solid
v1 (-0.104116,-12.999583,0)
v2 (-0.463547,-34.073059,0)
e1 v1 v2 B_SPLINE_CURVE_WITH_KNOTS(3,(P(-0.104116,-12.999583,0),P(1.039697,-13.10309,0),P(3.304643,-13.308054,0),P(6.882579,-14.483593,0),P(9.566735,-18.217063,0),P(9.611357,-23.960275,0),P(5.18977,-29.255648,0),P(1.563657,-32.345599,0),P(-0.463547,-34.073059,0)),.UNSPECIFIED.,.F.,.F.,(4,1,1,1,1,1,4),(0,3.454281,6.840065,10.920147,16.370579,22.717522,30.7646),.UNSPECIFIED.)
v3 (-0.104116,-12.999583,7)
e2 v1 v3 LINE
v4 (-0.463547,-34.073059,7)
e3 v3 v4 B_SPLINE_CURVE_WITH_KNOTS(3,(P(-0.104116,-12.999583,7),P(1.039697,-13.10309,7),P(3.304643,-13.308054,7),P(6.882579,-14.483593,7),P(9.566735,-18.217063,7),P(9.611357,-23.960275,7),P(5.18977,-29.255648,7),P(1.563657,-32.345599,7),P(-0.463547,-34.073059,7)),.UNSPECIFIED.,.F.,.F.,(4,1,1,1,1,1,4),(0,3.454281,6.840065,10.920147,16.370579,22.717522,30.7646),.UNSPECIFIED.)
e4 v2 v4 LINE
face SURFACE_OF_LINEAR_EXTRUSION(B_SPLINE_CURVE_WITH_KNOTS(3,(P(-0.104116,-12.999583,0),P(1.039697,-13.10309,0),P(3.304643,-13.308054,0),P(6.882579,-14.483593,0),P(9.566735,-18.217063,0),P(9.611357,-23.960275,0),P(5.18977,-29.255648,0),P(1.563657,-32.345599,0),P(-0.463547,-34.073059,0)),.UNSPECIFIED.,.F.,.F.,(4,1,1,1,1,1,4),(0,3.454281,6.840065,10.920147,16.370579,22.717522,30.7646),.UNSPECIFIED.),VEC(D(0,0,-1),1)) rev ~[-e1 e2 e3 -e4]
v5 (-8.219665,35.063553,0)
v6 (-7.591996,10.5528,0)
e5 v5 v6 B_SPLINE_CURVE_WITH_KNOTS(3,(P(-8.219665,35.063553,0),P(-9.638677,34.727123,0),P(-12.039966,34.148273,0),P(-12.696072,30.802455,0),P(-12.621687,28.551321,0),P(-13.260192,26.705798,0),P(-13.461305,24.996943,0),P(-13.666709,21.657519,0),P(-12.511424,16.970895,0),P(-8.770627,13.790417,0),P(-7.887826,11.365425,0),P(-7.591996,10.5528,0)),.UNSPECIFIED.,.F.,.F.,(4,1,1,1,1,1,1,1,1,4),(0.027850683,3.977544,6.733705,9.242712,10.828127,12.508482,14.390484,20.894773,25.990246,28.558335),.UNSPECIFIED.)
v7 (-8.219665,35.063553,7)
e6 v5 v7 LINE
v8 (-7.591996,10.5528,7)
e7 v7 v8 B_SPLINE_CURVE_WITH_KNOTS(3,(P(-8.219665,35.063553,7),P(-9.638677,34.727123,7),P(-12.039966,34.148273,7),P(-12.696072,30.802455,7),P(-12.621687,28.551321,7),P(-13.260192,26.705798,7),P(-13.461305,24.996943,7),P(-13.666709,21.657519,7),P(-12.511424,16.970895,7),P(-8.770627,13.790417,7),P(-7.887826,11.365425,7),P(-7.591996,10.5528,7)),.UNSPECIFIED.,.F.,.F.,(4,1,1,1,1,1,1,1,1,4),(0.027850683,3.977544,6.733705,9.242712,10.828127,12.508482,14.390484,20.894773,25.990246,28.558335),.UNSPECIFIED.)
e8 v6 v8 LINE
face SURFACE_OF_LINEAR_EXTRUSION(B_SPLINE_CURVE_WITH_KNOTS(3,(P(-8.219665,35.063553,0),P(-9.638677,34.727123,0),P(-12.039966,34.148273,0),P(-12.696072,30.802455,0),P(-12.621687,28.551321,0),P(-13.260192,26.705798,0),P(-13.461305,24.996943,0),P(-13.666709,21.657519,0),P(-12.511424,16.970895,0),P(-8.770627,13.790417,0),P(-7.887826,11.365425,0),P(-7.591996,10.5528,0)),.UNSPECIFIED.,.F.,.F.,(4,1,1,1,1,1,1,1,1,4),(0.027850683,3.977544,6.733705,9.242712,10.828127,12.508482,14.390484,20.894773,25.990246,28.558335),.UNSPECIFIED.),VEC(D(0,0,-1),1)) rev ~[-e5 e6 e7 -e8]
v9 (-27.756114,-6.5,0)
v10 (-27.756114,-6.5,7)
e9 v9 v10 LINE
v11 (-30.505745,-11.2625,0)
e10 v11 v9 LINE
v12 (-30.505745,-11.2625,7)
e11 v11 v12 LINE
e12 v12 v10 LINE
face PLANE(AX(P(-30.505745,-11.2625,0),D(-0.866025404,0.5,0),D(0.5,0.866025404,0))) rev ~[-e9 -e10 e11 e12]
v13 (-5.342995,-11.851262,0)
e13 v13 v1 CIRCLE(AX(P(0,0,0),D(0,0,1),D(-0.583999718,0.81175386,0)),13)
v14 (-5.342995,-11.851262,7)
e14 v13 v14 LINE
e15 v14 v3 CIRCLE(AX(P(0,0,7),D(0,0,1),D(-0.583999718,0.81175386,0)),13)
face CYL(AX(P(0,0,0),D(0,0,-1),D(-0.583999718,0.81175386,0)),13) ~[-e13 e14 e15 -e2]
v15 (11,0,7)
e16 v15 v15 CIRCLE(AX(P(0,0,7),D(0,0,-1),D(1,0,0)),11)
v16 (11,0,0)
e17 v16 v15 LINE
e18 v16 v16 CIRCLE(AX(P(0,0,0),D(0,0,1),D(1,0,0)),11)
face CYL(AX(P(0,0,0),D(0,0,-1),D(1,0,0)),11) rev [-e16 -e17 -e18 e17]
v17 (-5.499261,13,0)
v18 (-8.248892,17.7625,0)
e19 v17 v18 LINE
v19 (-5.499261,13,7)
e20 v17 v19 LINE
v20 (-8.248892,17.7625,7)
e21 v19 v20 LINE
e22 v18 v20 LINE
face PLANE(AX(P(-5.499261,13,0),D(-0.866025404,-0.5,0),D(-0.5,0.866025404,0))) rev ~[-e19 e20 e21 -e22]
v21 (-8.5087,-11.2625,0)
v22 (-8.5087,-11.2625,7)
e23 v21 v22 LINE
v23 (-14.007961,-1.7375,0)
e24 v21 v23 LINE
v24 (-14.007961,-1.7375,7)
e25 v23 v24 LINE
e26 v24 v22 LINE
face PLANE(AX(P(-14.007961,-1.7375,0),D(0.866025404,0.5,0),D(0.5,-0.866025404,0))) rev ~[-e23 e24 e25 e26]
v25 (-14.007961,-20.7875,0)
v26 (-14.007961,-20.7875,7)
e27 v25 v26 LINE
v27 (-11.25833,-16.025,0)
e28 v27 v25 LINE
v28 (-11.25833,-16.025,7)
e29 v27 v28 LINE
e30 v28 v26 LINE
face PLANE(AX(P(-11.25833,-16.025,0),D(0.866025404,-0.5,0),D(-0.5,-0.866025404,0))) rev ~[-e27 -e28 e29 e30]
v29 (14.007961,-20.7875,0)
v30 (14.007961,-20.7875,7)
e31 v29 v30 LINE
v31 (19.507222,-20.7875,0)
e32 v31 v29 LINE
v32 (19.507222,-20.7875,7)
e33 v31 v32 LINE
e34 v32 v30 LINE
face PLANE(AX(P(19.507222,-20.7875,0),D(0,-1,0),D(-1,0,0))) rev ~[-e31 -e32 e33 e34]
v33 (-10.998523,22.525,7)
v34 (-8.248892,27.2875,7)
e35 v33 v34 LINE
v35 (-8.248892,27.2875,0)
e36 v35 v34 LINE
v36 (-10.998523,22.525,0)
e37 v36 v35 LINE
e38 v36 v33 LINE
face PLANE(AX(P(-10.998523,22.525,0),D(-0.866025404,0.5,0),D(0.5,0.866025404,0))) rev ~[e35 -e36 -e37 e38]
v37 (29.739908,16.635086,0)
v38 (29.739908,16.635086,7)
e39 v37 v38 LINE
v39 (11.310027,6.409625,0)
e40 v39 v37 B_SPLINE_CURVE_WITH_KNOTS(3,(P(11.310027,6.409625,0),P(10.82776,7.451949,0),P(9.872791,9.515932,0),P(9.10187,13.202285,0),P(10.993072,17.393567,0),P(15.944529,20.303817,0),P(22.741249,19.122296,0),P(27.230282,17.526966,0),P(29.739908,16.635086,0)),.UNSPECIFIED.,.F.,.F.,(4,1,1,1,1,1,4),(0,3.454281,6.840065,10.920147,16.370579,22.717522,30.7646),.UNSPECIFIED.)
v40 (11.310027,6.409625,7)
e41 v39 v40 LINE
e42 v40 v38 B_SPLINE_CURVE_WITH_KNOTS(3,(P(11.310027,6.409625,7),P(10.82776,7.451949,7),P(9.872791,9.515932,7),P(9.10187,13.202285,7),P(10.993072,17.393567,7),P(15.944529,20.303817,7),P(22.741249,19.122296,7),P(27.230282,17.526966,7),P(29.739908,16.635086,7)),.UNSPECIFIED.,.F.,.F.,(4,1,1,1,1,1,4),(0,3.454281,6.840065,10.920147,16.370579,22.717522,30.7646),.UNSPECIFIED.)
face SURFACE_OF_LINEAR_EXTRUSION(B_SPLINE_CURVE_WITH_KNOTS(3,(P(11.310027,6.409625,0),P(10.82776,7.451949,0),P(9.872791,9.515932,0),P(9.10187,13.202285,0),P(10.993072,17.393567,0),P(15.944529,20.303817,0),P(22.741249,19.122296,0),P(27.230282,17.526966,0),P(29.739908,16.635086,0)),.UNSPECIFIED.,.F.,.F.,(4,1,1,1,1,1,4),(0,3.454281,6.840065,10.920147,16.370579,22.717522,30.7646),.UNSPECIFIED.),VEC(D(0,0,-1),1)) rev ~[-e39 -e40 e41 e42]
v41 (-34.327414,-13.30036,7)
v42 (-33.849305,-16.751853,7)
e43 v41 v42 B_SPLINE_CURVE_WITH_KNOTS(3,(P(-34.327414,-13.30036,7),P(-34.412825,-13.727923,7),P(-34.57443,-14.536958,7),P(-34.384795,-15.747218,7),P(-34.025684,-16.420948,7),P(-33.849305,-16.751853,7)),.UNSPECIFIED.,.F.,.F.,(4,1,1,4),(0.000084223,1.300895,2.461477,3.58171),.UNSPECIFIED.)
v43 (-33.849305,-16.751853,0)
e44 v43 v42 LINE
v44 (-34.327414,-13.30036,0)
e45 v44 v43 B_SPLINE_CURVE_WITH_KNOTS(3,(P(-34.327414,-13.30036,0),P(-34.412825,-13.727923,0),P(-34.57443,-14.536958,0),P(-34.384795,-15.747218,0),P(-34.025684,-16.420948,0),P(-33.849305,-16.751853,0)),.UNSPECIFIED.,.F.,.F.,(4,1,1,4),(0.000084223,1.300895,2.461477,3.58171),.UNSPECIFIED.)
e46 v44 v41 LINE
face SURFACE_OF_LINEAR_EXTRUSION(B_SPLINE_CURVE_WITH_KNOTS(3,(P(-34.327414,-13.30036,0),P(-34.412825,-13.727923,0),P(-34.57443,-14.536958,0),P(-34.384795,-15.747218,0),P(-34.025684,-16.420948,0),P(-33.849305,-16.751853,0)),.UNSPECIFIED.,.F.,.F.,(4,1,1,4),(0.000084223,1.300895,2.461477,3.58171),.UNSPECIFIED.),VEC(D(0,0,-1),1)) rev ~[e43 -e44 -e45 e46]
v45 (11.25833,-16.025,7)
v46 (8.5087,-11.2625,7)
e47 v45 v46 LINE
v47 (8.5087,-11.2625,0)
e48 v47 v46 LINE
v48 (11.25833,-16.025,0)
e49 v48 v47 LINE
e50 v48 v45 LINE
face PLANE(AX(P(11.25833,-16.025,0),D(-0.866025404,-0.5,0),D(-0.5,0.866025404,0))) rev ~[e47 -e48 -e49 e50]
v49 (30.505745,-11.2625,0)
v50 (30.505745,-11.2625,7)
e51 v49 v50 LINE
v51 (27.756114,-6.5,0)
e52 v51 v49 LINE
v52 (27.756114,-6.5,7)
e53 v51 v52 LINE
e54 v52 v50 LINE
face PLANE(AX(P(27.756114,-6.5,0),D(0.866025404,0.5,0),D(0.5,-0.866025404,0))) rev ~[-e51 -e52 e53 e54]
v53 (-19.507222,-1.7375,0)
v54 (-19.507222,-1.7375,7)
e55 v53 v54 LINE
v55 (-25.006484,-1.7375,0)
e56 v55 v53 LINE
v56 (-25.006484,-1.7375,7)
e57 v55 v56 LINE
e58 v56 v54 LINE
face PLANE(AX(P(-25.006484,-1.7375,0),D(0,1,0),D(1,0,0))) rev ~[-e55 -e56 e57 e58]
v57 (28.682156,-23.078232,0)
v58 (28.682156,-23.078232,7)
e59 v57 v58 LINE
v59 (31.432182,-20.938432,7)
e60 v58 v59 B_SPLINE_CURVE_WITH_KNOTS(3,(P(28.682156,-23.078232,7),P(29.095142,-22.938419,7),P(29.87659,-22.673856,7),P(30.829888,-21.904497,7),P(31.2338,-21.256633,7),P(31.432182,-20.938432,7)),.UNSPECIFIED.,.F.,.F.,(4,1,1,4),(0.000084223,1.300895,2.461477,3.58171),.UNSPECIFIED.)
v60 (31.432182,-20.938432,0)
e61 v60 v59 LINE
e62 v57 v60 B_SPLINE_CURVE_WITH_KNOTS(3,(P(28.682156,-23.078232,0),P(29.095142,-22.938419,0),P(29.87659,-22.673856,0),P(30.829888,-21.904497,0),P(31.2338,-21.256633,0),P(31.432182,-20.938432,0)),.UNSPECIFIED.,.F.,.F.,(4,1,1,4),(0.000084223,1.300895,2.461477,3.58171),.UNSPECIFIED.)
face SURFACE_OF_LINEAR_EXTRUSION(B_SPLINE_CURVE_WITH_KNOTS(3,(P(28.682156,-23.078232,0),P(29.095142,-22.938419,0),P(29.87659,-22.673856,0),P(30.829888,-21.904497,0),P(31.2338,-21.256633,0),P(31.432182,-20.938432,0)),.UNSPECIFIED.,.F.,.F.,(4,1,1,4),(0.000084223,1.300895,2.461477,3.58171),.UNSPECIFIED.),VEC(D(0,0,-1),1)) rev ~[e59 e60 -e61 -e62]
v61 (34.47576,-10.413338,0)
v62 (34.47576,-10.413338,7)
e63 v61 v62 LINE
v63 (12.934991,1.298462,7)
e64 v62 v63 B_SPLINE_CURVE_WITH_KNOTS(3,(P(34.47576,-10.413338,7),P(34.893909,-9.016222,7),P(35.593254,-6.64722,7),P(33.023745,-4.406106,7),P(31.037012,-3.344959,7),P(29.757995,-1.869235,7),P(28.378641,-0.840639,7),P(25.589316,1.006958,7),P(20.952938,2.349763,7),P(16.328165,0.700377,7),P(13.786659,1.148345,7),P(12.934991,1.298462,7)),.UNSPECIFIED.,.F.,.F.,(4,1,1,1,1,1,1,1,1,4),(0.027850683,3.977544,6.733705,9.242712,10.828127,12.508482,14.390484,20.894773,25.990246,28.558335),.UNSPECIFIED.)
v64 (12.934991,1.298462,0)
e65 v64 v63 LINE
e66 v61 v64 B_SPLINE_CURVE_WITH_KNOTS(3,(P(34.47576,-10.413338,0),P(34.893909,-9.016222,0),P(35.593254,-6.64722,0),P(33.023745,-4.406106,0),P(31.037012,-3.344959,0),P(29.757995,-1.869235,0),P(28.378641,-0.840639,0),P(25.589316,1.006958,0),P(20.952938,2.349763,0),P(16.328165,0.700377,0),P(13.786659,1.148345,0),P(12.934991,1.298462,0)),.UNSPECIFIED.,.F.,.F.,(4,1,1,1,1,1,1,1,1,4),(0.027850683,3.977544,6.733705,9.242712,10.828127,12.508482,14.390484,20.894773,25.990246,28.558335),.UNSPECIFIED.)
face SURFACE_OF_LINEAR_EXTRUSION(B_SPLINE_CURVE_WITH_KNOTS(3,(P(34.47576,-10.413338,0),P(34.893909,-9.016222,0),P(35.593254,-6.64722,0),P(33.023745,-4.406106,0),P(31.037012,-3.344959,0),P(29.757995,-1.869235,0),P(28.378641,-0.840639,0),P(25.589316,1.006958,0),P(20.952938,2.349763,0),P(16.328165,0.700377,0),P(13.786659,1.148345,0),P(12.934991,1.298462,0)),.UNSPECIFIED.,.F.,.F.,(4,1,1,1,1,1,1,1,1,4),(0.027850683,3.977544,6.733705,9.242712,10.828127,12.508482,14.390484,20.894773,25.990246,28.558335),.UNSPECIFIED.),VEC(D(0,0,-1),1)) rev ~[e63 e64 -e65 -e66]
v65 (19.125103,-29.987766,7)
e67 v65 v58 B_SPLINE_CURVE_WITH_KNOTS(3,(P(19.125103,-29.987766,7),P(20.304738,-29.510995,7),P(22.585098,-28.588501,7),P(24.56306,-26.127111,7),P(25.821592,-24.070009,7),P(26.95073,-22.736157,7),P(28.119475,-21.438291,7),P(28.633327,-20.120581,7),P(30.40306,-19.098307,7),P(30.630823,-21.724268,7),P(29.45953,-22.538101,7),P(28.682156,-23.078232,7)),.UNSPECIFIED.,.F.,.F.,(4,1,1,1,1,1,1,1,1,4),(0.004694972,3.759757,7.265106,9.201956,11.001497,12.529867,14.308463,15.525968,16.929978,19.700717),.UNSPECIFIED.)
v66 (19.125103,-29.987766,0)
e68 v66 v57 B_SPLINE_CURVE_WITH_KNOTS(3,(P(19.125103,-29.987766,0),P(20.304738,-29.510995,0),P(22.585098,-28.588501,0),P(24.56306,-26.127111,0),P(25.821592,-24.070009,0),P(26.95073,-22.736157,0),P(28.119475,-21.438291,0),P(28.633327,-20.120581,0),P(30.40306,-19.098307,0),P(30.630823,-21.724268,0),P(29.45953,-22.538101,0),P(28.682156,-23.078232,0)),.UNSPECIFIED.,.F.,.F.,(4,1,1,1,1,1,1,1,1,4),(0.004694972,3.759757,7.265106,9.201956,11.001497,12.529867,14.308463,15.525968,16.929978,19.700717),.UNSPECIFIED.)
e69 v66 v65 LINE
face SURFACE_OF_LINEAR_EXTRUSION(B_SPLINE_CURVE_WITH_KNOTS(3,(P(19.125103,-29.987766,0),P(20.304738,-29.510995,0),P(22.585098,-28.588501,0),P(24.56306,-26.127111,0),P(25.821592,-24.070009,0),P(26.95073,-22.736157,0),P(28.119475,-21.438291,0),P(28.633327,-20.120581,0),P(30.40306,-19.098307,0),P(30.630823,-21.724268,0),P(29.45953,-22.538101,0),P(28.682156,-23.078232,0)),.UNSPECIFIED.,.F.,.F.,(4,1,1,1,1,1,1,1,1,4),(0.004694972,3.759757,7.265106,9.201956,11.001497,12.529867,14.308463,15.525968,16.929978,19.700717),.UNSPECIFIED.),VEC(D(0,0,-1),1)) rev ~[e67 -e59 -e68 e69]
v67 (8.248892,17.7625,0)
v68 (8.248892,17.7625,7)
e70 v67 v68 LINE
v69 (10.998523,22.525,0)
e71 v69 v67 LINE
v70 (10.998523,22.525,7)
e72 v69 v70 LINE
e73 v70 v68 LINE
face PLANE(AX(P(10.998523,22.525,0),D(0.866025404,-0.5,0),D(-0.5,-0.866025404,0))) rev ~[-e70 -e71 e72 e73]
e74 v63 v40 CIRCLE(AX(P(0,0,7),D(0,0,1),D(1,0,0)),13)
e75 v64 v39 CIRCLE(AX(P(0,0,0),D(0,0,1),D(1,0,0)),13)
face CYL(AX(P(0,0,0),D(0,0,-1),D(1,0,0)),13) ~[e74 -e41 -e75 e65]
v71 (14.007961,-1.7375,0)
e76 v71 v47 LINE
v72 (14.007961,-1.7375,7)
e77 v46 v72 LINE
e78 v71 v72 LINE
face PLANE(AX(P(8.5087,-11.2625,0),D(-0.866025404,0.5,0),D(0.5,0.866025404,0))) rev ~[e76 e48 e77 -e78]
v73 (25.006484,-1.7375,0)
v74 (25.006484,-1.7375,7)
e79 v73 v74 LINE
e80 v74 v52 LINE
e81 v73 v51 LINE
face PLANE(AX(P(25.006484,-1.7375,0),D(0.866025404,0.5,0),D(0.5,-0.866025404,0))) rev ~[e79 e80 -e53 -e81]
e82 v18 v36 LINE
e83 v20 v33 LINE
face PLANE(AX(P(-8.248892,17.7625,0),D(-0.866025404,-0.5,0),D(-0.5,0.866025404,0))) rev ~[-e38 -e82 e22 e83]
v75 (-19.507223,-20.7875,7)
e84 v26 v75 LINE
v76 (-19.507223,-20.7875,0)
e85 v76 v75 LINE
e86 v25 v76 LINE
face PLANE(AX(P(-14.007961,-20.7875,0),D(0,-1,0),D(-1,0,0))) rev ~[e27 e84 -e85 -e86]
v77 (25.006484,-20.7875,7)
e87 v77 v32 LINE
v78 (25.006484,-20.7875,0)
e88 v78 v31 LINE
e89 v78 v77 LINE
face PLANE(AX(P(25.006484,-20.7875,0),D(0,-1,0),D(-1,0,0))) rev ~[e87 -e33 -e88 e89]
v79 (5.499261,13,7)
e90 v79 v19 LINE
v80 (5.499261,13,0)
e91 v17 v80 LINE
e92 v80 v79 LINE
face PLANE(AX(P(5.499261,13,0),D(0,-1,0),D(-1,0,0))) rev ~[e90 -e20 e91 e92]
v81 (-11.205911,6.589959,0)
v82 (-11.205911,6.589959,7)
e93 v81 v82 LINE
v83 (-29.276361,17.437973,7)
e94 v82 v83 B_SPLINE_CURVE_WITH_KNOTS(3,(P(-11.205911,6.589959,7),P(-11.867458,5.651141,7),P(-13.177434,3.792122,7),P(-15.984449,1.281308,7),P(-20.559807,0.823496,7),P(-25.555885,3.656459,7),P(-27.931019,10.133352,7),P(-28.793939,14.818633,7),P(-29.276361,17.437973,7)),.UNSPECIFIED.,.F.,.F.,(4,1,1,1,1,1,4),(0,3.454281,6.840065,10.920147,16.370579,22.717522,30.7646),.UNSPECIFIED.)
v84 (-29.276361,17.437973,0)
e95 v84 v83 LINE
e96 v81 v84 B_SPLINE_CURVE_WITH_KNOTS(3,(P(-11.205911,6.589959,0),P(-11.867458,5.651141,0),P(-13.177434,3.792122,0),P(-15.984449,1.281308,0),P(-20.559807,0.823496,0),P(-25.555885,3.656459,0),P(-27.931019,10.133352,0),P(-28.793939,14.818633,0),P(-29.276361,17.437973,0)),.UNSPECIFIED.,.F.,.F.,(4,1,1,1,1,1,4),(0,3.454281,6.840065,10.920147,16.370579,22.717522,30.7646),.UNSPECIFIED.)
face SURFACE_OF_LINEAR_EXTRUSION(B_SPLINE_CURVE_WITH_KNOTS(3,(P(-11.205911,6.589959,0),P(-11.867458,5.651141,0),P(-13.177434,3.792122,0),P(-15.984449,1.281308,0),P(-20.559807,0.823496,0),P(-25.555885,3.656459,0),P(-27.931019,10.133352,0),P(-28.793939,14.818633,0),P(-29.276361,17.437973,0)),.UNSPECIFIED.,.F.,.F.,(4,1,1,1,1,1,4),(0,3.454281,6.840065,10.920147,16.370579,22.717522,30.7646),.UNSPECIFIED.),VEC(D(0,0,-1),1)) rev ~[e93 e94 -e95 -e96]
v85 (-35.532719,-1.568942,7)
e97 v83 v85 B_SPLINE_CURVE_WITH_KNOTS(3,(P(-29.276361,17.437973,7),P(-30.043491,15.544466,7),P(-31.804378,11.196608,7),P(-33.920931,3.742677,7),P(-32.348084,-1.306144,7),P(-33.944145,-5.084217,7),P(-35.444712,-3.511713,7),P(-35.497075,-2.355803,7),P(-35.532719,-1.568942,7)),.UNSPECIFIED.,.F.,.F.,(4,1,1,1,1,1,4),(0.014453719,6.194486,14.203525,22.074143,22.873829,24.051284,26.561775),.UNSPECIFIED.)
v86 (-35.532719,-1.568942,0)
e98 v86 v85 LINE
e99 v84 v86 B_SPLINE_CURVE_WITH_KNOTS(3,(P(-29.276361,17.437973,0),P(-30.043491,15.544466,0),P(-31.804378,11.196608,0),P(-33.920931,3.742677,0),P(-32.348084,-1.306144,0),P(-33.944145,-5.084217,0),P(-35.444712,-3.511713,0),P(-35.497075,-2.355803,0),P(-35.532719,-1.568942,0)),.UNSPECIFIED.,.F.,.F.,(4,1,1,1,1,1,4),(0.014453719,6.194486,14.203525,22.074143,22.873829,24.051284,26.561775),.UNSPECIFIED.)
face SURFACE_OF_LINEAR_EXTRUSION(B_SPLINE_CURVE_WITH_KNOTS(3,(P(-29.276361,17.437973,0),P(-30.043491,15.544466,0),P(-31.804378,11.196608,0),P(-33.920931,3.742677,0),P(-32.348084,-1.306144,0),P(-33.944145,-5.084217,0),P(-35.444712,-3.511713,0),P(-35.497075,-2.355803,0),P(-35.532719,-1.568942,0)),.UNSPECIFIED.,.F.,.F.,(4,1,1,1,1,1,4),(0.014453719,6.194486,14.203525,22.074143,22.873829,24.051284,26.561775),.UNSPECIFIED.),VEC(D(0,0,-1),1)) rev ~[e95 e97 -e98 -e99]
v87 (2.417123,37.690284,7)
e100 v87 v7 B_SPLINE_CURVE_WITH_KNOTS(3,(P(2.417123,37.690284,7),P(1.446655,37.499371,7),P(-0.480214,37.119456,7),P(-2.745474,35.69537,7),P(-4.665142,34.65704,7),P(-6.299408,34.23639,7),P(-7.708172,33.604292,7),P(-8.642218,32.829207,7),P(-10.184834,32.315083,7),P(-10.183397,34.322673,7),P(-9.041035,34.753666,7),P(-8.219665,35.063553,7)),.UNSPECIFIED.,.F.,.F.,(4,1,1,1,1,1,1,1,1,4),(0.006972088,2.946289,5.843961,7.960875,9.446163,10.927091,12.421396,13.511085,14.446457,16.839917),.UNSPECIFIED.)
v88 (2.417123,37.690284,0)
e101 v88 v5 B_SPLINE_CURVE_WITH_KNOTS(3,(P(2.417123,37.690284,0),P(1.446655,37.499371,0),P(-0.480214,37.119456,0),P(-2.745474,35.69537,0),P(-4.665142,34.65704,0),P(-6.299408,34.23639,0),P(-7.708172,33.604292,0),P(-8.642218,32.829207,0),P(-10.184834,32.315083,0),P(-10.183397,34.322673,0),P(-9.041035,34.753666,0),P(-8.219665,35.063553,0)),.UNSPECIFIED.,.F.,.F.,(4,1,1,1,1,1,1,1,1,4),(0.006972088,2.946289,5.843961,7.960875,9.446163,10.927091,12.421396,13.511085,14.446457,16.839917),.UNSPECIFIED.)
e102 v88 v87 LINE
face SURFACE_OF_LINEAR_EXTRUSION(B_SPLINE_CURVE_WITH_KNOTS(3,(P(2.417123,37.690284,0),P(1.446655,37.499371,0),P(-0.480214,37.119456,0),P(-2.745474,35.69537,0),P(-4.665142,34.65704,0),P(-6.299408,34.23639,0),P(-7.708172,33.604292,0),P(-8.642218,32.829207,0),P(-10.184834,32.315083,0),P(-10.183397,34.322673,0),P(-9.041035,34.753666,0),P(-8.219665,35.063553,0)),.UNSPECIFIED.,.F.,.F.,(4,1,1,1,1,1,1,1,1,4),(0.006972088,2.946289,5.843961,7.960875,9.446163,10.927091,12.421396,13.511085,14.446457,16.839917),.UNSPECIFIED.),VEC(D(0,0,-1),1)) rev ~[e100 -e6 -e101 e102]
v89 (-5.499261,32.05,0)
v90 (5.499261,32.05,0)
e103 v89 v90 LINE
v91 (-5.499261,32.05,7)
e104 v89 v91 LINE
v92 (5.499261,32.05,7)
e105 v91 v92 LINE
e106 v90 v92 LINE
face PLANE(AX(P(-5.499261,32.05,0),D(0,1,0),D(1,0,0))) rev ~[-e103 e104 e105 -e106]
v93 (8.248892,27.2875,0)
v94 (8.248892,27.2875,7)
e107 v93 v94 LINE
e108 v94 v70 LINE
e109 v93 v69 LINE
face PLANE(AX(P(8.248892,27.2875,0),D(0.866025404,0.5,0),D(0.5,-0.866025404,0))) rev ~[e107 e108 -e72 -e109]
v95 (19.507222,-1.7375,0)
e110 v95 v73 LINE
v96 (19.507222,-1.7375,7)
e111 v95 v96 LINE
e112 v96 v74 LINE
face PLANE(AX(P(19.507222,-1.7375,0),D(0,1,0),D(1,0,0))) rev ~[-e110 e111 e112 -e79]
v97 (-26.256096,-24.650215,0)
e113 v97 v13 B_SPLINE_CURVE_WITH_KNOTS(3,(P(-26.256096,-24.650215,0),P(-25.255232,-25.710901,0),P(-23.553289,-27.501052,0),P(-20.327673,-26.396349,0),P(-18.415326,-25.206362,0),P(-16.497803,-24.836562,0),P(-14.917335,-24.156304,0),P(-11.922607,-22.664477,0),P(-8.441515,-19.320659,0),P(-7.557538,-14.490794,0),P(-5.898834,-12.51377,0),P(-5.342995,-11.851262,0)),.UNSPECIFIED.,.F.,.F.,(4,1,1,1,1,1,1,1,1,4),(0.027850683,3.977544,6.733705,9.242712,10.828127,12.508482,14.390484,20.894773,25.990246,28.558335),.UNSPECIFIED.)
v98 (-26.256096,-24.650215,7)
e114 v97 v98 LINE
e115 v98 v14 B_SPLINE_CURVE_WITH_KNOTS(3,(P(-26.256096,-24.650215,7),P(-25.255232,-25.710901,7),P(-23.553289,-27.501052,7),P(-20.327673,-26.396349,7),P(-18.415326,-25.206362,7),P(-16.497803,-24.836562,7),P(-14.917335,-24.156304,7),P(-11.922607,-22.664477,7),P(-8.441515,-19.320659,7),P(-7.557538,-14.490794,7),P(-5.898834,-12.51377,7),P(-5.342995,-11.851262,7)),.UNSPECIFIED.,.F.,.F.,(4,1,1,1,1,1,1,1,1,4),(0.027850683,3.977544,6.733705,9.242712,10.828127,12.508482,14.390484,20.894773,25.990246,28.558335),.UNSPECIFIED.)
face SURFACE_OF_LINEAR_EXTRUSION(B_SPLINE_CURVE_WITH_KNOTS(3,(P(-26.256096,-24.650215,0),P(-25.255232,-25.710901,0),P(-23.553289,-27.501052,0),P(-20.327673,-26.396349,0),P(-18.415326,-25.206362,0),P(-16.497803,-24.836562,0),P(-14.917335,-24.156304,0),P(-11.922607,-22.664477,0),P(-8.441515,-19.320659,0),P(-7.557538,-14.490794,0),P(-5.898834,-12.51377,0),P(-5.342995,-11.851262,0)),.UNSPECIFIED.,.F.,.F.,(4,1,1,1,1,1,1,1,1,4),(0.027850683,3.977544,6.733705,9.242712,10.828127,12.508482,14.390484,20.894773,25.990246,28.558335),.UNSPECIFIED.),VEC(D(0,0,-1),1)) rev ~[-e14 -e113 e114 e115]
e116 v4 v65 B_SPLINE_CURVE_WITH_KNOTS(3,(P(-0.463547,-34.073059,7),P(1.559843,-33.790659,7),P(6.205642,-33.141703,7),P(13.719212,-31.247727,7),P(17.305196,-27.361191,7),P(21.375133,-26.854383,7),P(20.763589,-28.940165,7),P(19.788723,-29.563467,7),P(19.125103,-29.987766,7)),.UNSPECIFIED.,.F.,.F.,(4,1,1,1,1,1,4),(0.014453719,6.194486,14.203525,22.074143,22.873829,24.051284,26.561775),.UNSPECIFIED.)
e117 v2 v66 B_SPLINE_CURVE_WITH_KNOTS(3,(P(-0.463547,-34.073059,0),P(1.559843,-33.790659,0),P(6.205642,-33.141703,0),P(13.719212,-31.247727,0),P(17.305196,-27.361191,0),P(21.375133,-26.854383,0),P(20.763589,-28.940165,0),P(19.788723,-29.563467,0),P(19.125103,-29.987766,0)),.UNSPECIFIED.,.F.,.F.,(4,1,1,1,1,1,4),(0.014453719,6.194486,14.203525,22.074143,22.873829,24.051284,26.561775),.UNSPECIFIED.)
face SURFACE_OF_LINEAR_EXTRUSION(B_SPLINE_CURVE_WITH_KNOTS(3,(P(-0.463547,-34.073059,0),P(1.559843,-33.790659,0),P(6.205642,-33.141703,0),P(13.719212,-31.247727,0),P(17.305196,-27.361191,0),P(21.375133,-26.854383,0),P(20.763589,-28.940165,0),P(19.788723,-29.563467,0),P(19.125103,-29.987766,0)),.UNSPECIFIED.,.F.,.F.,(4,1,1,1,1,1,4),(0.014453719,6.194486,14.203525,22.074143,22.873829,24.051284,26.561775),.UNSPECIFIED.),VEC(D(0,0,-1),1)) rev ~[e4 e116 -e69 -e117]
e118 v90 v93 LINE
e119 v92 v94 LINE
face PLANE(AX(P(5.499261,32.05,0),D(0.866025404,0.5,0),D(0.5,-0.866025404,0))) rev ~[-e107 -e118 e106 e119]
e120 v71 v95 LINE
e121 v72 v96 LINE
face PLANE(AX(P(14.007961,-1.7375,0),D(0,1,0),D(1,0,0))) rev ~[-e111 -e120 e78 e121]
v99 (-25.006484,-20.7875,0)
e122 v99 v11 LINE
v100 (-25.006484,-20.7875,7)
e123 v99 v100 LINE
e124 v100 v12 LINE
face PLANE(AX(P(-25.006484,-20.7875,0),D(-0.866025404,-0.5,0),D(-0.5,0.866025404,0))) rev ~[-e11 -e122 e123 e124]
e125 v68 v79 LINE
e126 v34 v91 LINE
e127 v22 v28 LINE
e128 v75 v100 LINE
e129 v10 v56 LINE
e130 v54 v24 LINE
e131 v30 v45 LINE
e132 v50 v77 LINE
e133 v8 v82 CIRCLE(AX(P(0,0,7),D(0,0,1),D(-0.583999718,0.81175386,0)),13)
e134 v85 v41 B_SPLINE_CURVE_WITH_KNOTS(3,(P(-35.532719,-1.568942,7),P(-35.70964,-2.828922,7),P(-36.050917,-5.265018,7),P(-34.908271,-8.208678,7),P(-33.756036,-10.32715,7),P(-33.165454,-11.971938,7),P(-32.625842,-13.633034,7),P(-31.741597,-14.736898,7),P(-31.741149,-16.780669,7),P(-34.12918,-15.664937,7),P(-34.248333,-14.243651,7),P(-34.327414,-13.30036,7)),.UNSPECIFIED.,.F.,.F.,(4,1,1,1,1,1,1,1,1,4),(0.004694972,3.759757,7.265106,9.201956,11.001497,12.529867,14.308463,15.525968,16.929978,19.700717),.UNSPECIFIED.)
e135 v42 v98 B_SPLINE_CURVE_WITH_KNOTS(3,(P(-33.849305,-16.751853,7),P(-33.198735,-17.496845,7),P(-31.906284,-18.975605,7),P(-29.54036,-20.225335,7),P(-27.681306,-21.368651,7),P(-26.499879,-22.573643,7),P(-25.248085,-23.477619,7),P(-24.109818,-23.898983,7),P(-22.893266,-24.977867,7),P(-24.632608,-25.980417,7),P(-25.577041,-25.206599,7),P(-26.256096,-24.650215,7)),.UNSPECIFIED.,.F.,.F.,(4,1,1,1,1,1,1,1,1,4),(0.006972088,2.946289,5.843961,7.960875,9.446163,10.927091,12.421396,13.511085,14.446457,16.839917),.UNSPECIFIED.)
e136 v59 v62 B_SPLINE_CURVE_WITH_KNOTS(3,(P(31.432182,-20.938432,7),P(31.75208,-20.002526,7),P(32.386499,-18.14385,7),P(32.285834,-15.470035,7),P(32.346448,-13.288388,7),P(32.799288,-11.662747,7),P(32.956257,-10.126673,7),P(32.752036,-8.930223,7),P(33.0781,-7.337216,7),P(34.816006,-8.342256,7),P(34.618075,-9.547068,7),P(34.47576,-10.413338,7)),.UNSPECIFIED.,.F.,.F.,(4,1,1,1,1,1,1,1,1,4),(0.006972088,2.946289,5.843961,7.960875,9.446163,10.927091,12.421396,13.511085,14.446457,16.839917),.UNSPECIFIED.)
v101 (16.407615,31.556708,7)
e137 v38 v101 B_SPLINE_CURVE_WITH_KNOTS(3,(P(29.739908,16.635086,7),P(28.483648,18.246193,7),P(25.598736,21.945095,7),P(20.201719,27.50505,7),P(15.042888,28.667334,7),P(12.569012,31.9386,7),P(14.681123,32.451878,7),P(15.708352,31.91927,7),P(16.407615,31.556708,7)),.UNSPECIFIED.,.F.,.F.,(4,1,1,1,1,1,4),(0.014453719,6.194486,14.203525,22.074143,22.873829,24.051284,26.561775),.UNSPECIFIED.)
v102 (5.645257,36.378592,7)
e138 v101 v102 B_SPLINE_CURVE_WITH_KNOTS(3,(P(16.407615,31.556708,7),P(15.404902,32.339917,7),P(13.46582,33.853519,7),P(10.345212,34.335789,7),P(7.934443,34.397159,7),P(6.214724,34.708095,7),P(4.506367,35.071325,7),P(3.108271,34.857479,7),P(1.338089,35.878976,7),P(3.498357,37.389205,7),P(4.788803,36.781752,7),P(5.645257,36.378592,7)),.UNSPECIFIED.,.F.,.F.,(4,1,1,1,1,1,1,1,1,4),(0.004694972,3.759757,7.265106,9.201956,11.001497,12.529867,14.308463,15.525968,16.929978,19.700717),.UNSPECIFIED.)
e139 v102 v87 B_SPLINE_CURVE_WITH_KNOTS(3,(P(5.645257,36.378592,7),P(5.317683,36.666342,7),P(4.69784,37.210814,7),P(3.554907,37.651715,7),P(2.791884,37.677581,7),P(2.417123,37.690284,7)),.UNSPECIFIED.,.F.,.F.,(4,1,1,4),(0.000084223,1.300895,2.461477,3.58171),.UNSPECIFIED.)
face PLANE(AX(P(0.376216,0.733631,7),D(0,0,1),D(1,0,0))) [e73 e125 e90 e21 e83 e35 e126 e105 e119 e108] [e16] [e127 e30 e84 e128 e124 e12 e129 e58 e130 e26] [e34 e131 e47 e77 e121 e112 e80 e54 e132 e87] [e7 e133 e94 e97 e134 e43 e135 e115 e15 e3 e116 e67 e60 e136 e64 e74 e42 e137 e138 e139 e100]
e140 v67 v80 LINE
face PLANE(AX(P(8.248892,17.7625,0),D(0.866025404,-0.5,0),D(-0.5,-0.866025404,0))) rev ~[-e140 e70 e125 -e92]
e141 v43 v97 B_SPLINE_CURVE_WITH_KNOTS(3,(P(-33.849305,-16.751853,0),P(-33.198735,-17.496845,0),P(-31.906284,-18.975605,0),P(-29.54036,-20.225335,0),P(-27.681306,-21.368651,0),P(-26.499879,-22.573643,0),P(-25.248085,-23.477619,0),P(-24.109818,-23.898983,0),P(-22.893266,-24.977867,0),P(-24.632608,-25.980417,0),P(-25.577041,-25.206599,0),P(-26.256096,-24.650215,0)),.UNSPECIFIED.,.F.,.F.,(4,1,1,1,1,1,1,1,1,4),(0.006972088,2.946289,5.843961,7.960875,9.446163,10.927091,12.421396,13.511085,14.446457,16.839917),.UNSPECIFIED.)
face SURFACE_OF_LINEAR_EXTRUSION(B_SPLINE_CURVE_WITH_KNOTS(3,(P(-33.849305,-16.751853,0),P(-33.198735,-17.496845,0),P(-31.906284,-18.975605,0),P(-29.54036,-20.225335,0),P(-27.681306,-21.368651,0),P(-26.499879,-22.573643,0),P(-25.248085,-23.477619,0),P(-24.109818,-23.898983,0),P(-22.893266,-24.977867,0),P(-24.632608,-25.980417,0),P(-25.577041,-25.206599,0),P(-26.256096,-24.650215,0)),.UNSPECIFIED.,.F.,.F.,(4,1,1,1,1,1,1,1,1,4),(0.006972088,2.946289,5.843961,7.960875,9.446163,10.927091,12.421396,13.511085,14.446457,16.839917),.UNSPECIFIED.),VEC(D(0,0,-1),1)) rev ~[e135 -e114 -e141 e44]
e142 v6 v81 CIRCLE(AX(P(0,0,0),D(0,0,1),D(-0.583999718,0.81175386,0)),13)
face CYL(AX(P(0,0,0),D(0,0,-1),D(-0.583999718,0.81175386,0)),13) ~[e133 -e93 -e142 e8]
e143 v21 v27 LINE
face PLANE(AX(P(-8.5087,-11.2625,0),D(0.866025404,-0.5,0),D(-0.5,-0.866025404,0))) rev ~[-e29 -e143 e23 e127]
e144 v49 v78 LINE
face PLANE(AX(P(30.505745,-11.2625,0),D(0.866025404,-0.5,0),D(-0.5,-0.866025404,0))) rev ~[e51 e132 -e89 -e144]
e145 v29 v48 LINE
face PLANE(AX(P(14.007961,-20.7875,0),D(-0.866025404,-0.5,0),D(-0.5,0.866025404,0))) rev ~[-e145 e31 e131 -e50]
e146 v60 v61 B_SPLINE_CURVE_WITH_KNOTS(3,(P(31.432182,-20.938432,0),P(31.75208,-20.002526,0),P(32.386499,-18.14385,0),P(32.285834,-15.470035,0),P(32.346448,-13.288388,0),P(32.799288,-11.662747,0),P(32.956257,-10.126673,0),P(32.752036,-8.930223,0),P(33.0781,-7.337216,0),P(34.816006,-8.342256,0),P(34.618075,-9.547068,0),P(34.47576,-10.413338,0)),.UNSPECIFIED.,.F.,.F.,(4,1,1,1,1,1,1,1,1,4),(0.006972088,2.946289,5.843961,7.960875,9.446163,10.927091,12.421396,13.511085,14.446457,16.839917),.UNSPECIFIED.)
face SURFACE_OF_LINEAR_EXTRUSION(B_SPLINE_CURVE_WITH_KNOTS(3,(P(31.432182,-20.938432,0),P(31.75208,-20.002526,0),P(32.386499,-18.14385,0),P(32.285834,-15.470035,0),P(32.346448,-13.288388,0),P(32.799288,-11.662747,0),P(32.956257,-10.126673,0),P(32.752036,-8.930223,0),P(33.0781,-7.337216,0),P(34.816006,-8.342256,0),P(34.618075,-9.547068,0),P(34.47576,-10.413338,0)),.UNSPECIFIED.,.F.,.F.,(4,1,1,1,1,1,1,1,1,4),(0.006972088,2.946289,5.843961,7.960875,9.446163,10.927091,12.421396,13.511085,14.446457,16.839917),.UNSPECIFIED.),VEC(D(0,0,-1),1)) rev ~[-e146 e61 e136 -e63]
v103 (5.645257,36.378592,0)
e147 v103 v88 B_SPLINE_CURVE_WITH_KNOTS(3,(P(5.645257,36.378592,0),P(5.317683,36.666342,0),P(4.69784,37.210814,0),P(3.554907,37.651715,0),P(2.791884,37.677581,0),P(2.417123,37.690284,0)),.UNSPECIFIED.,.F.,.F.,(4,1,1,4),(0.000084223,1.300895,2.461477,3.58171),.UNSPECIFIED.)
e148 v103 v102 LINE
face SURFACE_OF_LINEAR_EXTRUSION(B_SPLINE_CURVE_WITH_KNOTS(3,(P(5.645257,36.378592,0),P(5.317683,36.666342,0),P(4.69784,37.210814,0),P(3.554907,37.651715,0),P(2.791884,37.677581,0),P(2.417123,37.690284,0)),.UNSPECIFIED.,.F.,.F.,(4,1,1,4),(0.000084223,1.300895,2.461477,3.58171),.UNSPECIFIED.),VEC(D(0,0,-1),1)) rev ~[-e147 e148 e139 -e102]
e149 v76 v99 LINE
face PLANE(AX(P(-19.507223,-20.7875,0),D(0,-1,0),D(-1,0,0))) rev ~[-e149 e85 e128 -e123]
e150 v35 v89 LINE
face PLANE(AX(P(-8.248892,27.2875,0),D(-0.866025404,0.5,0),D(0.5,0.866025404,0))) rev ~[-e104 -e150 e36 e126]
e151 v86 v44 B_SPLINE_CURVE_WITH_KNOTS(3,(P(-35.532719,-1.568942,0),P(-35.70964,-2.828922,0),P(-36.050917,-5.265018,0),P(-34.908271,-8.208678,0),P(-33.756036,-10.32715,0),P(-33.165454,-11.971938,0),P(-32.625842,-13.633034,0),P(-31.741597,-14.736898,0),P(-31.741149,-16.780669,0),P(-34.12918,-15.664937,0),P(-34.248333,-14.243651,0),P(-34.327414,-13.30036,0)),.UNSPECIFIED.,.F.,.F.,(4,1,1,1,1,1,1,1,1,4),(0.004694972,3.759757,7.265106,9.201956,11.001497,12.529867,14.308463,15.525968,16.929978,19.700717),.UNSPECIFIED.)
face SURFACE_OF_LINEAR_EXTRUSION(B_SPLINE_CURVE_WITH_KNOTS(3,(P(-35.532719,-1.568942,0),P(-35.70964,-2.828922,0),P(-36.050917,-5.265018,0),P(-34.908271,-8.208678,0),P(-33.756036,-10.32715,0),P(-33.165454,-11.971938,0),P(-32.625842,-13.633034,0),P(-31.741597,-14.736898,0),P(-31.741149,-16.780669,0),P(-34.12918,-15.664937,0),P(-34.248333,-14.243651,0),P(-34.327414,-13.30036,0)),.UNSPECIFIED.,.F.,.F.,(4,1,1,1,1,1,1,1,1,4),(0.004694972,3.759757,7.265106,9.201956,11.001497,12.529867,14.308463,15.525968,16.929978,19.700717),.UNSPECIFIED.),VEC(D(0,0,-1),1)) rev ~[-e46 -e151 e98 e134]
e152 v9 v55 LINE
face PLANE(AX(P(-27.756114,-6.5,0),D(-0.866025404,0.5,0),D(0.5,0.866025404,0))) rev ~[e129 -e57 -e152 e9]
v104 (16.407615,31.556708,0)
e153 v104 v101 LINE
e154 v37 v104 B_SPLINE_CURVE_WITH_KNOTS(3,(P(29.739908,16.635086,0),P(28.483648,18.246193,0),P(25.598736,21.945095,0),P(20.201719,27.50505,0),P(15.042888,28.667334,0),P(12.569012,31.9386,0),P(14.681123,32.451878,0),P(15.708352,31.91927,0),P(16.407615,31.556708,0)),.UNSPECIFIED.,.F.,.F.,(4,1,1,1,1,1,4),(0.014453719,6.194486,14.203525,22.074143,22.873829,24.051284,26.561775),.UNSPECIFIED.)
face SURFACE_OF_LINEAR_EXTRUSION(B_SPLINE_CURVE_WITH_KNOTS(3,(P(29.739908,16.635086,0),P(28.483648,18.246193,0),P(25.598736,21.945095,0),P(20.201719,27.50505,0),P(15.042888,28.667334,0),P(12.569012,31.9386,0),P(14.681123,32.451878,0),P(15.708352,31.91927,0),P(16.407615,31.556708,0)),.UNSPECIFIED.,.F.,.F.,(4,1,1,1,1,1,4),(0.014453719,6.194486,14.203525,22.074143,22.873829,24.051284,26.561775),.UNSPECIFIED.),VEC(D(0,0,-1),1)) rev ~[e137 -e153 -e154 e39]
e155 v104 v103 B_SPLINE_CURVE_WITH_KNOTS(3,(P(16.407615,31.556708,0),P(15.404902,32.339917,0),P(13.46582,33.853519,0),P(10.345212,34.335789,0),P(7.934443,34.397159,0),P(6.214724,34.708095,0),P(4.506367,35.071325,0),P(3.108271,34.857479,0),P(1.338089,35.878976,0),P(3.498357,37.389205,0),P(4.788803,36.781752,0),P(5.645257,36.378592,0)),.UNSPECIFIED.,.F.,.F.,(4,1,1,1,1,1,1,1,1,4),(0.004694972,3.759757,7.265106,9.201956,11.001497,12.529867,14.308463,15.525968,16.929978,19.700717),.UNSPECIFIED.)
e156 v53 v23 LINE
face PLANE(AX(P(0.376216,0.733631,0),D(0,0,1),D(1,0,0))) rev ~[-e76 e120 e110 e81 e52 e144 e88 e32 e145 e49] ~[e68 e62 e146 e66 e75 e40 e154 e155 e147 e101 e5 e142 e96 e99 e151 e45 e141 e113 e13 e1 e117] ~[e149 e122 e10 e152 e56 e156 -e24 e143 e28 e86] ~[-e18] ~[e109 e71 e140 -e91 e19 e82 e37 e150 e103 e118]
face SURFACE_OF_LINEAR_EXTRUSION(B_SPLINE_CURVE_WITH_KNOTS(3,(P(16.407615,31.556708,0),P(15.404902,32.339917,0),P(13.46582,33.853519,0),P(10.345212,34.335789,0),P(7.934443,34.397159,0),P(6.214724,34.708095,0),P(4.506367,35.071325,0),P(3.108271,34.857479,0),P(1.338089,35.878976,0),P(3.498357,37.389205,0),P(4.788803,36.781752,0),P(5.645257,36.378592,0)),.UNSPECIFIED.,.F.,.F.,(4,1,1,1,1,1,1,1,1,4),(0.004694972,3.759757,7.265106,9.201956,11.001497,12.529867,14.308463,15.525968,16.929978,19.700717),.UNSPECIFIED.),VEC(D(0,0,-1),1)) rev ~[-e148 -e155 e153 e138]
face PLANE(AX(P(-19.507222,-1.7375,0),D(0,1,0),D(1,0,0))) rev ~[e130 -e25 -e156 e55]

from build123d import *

# Parameters (mm, degrees)
F0_R     = 11
F1_DEPTH = 7
F2_COUNT = 3


# Not quite as in the source:
# - the dataset's text gives a spline's control points without its knots; the knots are read off the source's solid
# - a feature names something its author has since deleted; it is built from what else it names


with BuildPart() as f1:
    # F0 (on Top) → F1 (new body)
    with BuildSketch(Plane.XY):
        with BuildLine():
            ThreePointArc((-7.5919963353, 10.5528001803), (-5.9289142194, -11.5692686104), (13, 0))
            ThreePointArc((13, 0), (12.5704087578, 3.3143360817), (11.3100271289, 6.4096245088))
            ThreePointArc((11.3100271289, 6.4096245088), (6.5450317559, 11.2322107937), (-1.3e-09, 13))
            ThreePointArc((-1.3e-09, 13), (-3.9883328388, 12.3730837372), (-7.5919963353, 10.5528001803))
        make_face()
        Circle(F0_R, mode=Mode.SUBTRACT)
        with BuildLine():
            ThreePointArc((-1.3e-09, 13), (6.5450317559, 11.2322107937), (11.3100271289, 6.4096245088))
            add(Edge.make_bspline(
                [(11.3100271289, 6.4096245088), (10.8277603254, 7.4519494012), (9.8727913781, 9.5159316196), (9.101870084, 13.2022847878), (10.9930717603, 17.3935667079), (15.9445286102, 20.3038165496), (22.7412492325, 19.1222960129), (27.2302822076, 17.5269663637), (29.7399077416, 16.6350860483)],
                knots=[0, 0, 0, 0, 3.454281, 6.840065, 10.920147, 16.370579, 22.717522, 30.7646, 30.7646, 30.7646, 30.7646], degree=3))
            add(Edge.make_bspline(
                [(29.7399077416, 16.6350860483), (28.4836475385, 18.2461931845), (25.5987360843, 21.9450952017), (20.2017189577, 27.5050498478), (15.0428882075, 28.6673343945), (12.5690115148, 31.9385999614), (14.6811233168, 32.4518778122), (15.7083520351, 31.9192701431), (16.407615424, 31.5567081202)],
                knots=[0.0144537192, 0.0144537192, 0.0144537192, 0.0144537192, 6.194486, 14.203525, 22.074143, 22.873829, 24.051284, 26.561775, 26.561775, 26.561775, 26.561775], degree=3))
            add(Edge.make_bspline(
                [(16.407615424, 31.5567081202), (15.4049023222, 32.3399165847), (13.4658196059, 33.8535190511), (10.3452119002, 34.3357889044), (7.9344434577, 34.3971594843), (6.2147244404, 34.7080952785), (4.5063669183, 35.0713247495), (3.1082707439, 34.8574787663), (1.3380885049, 35.8789758676), (3.4983566078, 37.3892054026), (4.7888025313, 36.7817520454), (5.6452574026, 36.3785922272)],
                knots=[0.0046949721, 0.0046949721, 0.0046949721, 0.0046949721, 3.759757, 7.265106, 9.201956, 11.001497, 12.529867, 14.308463, 15.525968, 16.929978, 19.700717, 19.700717, 19.700717, 19.700717], degree=3))
            add(Edge.make_bspline(
                [(5.6452574026, 36.3785922272), (5.3176826436, 36.6663420667), (4.6978399336, 37.2108137216), (3.5549068491, 37.6517152685), (2.7918842622, 37.6775809796), (2.4171225183, 37.6902842884)],
                knots=[8.42234e-05, 8.42234e-05, 8.42234e-05, 8.42234e-05, 1.300895, 2.461477, 3.58171, 3.58171, 3.58171, 3.58171], degree=3))
            add(Edge.make_bspline(
                [(2.4171225183, 37.6902842884), (1.4466554473, 37.4993707055), (-0.4802140411, 37.1194555701), (-2.7454735423, 35.6953695532), (-4.66514216, 34.6570397494), (-6.2994083365, 34.2363899874), (-7.708171918, 33.604292052), (-8.6422176542, 32.8292069294), (-10.184834153, 32.3150830289), (-10.1833973742, 34.322673268), (-9.0410345214, 34.7536662817), (-8.2196646451, 35.0635532875)],
                knots=[0.0069720876, 0.0069720876, 0.0069720876, 0.0069720876, 2.946289, 5.843961, 7.960875, 9.446163, 10.927091, 12.421396, 13.511085, 14.446457, 16.839917, 16.839917, 16.839917, 16.839917], degree=3))
            add(Edge.make_bspline(
                [(-8.2196646451, 35.0635532875), (-9.6386773765, 34.7271226927), (-12.0399656, 34.1482725614), (-12.6960723373, 30.8024553033), (-12.6216866169, 28.5513207343), (-13.2601924534, 26.705797678), (-13.4613053983, 24.996943365), (-13.6667091736, 21.6575187534), (-12.5114237856, 16.9708953473), (-8.770627027, 13.7904170142), (-7.8878258097, 11.3654245815), (-7.5919963353, 10.5528001803)],
                knots=[0.027850683, 0.027850683, 0.027850683, 0.027850683, 3.977544, 6.733705, 9.242712, 10.828127, 12.508482, 14.390484, 20.894773, 25.990246, 28.558335, 28.558335, 28.558335, 28.558335], degree=3))
            ThreePointArc((-7.5919963353, 10.5528001803), (-3.9883328388, 12.3730837372), (-1.3e-09, 13))
        make_face()
        Polygon((5.499261314, 13), (-1.3e-09, 13), (-5.499261314, 13), (-8.2488920963, 17.7625002169), (-10.9985226281, 22.525), (-8.24889179, 27.2875003136), (-5.499261314, 32.05), (0, 32.05), (5.499261314, 32.05), (8.2488918485, 27.2875002122), (10.9985226281, 22.525), (8.248891917, 17.7624999064), align=None, mode=Mode.SUBTRACT)
    extrude(amount=F1_DEPTH)

    # F2: F1 ×3 about axis
    f2_axis = Axis((0, 0, 7), (0, 0, 1))


with BuildPart() as f1_1:
    add(f1.part)
    for i in range(1, F2_COUNT):
        add(f1.part.rotate(f2_axis, i * 360 / F2_COUNT))


solid = f1_1.part
